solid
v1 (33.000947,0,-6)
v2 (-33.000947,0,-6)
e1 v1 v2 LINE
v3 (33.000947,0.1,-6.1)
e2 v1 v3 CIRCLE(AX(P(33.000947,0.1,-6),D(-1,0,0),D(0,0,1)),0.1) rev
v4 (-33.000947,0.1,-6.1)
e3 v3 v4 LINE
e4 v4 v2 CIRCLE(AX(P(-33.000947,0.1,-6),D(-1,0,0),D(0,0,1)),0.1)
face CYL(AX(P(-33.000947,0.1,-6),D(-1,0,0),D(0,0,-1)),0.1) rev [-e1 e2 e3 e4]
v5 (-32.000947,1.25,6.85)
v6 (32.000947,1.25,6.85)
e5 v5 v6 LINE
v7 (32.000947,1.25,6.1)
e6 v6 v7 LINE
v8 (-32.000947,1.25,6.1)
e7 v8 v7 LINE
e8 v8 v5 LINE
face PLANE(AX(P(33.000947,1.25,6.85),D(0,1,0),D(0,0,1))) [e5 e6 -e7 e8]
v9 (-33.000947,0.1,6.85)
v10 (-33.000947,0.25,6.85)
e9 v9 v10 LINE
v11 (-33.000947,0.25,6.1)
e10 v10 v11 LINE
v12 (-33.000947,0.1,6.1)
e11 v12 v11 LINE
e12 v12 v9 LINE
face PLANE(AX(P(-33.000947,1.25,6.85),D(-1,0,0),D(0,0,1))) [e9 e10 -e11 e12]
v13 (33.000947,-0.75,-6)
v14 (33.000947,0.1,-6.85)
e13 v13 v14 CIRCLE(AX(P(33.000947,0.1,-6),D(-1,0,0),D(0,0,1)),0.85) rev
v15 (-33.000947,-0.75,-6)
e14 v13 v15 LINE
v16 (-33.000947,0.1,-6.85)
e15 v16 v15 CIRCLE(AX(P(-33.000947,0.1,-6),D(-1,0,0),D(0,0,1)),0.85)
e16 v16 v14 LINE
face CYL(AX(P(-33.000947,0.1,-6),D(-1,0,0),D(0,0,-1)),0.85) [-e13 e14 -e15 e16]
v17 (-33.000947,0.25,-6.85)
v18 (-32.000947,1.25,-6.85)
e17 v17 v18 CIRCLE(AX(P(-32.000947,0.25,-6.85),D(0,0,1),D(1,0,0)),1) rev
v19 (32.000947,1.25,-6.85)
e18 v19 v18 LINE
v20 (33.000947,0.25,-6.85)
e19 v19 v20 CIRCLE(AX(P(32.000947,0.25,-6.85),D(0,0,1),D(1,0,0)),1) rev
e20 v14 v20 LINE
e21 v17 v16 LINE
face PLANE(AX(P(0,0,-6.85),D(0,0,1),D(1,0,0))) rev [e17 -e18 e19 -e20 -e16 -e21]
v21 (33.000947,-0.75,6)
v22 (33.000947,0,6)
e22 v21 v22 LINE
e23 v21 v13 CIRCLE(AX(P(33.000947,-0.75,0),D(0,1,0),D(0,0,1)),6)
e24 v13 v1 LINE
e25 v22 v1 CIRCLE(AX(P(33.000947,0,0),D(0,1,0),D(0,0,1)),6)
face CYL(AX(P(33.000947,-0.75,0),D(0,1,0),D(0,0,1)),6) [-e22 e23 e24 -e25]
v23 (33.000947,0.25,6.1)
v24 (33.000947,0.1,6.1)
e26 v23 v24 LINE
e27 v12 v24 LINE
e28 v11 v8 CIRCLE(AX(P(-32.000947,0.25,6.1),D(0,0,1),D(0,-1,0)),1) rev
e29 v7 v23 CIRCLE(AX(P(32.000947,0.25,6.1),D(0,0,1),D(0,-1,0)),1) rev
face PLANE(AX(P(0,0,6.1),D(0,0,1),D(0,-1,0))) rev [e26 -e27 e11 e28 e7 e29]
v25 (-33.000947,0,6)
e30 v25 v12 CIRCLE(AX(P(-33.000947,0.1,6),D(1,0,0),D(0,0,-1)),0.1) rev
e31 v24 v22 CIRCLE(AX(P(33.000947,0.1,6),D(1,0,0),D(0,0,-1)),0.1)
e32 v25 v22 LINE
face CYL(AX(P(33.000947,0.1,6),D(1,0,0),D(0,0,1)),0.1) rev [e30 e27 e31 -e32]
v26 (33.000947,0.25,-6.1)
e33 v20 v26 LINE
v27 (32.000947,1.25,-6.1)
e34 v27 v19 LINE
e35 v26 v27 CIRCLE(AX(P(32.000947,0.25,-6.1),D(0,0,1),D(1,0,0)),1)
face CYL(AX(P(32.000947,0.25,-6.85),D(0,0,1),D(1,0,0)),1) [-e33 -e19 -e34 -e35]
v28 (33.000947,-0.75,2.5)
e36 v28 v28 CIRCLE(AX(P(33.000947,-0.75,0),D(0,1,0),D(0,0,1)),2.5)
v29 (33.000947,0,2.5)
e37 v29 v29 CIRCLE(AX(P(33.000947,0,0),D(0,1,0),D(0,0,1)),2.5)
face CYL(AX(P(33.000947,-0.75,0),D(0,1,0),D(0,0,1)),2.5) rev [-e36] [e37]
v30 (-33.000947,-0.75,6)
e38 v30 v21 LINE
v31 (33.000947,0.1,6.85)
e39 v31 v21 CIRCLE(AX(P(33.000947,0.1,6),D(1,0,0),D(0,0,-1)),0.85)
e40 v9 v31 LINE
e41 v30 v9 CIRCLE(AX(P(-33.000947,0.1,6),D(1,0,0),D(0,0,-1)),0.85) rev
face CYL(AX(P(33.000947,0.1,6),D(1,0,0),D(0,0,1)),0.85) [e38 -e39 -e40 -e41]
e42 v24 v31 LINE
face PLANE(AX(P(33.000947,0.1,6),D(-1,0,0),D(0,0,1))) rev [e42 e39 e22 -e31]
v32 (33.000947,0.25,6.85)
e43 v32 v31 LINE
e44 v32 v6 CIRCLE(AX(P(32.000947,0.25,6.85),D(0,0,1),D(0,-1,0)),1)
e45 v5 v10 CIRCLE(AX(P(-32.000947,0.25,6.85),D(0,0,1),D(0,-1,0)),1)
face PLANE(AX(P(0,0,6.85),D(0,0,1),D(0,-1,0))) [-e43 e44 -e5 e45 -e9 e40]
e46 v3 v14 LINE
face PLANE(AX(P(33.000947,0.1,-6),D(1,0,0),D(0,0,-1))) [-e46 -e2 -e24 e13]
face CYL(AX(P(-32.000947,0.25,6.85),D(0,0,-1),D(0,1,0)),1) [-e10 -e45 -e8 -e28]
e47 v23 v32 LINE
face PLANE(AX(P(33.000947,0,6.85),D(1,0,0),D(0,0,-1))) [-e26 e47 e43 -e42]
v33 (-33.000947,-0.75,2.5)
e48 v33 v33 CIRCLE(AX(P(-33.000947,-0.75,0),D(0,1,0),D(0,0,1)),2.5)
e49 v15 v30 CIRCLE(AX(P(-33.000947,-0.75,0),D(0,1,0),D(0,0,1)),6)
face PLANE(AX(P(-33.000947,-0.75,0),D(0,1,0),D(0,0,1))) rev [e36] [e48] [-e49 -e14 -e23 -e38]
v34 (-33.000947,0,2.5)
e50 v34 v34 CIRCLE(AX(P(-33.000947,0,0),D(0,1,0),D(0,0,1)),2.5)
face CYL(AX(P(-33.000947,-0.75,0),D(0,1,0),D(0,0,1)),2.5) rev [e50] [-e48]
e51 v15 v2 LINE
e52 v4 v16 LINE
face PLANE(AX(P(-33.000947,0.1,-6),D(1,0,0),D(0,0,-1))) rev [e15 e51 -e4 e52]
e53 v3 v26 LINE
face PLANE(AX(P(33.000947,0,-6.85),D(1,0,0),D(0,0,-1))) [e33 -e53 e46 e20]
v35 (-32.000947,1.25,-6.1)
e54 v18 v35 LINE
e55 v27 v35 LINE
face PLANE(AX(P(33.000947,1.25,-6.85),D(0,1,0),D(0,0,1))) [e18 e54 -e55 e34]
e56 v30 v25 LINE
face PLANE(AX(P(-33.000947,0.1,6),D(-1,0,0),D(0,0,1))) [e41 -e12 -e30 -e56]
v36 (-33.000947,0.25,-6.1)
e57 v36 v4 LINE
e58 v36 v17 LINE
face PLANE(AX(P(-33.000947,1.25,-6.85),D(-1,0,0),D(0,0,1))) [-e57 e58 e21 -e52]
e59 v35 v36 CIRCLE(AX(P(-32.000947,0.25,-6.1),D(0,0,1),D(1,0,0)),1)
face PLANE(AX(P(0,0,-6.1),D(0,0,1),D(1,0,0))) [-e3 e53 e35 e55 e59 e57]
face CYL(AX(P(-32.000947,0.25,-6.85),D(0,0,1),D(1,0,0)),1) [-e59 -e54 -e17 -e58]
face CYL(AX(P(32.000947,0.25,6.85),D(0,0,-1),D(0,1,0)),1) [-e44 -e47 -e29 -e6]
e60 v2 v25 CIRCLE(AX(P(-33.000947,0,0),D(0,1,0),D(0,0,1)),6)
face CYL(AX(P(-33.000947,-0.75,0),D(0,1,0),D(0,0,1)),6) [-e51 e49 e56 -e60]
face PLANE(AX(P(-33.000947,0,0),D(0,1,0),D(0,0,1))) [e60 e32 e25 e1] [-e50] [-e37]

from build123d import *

# Parameters (mm, degrees)
SKETCH2_R               = 2.5
BASE_FLANGE1_DEPTH      = 0.75
EDGE_FLANGE1_DEPTH      = 66.001893912
EDGE_FLANGE1_BEND_DEPTH = 66.001893912
BREAK_CORNER1_START     = -6.85
BREAK_CORNER1_DEPTH     = 13.7


# Read off the part's stored shape, not the designer's step: Break-Corner1
# Sheet-metal steps are written as plain solids
with BuildPart() as part:
    # Sketch2 → Base-Flange1 (new body)
    with BuildSketch(Plane(origin=(0, 0, 0), x_dir=(1, 0, 0), z_dir=(0, 1, 0))):
        with BuildLine():
            Line((-33.000946956, 6), (33.000946956, 6))
            ThreePointArc((33.000946956, 6), (39.000946956, 0), (33.000946956, -6))
            Line((33.000946956, -6), (-33.000946956, -6))
            ThreePointArc((-33.000946956, -6), (-39.000946956, 0), (-33.000946956, 6))
        make_face()
        with Locations(Location((33.000946956, 0, 0), (0, 0, 270))):
            Circle(SKETCH2_R, mode=Mode.SUBTRACT)
        with Locations(Location((-33.000946956, 0, 0), (0, 0, 270))):
            Circle(SKETCH2_R, mode=Mode.SUBTRACT)
    extrude(amount=-BASE_FLANGE1_DEPTH)

    # Edge-Flange1 section (across the edge) → Edge-Flange1 (add)
    with BuildSketch(Plane(origin=(-33.000946956, 0, 6.1), x_dir=(0, 0, -1), z_dir=(1, 0, 0))):
        with BuildLine():
            Line((-0.75, 0.1), (-0.75, 1.25))
            Line((-0.75, 1.25), (0, 1.25))
            Line((0, 1.25), (0, 0.1))
            ThreePointArc((0, 0.1), (0.029289322, 0.029289322), (0.1, 0))
            Line((0.1, 0), (0.1, -0.75))
            ThreePointArc((0.1, -0.75), (-0.501040764, -0.501040764), (-0.75, 0.1))
        make_face()
    extrude(amount=EDGE_FLANGE1_DEPTH)

    # Edge-Flange1 section 2 (across the edge) → Edge-Flange1 bend (add)
    with BuildSketch(Plane(origin=(33.000946956, 0, -6.1), x_dir=(0, 0, 1), z_dir=(-1, 0, 0))):
        with BuildLine():
            Line((-0.75, 0.1), (-0.75, 1.25))
            Line((-0.75, 1.25), (0, 1.25))
            Line((0, 1.25), (0, 0.1))
            ThreePointArc((0, 0.1), (0.029289322, 0.029289322), (0.1, 0))
            Line((0.1, 0), (0.1, -0.75))
            ThreePointArc((0.1, -0.75), (-0.501040764, -0.501040764), (-0.75, 0.1))
        make_face()
    extrude(amount=EDGE_FLANGE1_BEND_DEPTH)

    # Break-Corner1 outline → Break-Corner1 (cut)
    with BuildSketch(Plane.XY.offset(BREAK_CORNER1_START)):
        with BuildLine():
            ThreePointArc((-33.000946956, 0.25), (-32.708053737, 0.957106781), (-32.000946956, 1.25))
            Line((-32.000946956, 1.25), (-33.000946956, 1.25))
            Line((-33.000946956, 1.25), (-33.000946956, 0.25))
        make_face()
        with BuildLine():
            ThreePointArc((32.000946956, 1.25), (32.708053737, 0.957106781), (33.000946956, 0.25))
            Line((33.000946956, 0.25), (33.000946956, 1.25))
            Line((33.000946956, 1.25), (32.000946956, 1.25))
        make_face()
    extrude(amount=BREAK_CORNER1_DEPTH, mode=Mode.SUBTRACT)


solid = part.part
